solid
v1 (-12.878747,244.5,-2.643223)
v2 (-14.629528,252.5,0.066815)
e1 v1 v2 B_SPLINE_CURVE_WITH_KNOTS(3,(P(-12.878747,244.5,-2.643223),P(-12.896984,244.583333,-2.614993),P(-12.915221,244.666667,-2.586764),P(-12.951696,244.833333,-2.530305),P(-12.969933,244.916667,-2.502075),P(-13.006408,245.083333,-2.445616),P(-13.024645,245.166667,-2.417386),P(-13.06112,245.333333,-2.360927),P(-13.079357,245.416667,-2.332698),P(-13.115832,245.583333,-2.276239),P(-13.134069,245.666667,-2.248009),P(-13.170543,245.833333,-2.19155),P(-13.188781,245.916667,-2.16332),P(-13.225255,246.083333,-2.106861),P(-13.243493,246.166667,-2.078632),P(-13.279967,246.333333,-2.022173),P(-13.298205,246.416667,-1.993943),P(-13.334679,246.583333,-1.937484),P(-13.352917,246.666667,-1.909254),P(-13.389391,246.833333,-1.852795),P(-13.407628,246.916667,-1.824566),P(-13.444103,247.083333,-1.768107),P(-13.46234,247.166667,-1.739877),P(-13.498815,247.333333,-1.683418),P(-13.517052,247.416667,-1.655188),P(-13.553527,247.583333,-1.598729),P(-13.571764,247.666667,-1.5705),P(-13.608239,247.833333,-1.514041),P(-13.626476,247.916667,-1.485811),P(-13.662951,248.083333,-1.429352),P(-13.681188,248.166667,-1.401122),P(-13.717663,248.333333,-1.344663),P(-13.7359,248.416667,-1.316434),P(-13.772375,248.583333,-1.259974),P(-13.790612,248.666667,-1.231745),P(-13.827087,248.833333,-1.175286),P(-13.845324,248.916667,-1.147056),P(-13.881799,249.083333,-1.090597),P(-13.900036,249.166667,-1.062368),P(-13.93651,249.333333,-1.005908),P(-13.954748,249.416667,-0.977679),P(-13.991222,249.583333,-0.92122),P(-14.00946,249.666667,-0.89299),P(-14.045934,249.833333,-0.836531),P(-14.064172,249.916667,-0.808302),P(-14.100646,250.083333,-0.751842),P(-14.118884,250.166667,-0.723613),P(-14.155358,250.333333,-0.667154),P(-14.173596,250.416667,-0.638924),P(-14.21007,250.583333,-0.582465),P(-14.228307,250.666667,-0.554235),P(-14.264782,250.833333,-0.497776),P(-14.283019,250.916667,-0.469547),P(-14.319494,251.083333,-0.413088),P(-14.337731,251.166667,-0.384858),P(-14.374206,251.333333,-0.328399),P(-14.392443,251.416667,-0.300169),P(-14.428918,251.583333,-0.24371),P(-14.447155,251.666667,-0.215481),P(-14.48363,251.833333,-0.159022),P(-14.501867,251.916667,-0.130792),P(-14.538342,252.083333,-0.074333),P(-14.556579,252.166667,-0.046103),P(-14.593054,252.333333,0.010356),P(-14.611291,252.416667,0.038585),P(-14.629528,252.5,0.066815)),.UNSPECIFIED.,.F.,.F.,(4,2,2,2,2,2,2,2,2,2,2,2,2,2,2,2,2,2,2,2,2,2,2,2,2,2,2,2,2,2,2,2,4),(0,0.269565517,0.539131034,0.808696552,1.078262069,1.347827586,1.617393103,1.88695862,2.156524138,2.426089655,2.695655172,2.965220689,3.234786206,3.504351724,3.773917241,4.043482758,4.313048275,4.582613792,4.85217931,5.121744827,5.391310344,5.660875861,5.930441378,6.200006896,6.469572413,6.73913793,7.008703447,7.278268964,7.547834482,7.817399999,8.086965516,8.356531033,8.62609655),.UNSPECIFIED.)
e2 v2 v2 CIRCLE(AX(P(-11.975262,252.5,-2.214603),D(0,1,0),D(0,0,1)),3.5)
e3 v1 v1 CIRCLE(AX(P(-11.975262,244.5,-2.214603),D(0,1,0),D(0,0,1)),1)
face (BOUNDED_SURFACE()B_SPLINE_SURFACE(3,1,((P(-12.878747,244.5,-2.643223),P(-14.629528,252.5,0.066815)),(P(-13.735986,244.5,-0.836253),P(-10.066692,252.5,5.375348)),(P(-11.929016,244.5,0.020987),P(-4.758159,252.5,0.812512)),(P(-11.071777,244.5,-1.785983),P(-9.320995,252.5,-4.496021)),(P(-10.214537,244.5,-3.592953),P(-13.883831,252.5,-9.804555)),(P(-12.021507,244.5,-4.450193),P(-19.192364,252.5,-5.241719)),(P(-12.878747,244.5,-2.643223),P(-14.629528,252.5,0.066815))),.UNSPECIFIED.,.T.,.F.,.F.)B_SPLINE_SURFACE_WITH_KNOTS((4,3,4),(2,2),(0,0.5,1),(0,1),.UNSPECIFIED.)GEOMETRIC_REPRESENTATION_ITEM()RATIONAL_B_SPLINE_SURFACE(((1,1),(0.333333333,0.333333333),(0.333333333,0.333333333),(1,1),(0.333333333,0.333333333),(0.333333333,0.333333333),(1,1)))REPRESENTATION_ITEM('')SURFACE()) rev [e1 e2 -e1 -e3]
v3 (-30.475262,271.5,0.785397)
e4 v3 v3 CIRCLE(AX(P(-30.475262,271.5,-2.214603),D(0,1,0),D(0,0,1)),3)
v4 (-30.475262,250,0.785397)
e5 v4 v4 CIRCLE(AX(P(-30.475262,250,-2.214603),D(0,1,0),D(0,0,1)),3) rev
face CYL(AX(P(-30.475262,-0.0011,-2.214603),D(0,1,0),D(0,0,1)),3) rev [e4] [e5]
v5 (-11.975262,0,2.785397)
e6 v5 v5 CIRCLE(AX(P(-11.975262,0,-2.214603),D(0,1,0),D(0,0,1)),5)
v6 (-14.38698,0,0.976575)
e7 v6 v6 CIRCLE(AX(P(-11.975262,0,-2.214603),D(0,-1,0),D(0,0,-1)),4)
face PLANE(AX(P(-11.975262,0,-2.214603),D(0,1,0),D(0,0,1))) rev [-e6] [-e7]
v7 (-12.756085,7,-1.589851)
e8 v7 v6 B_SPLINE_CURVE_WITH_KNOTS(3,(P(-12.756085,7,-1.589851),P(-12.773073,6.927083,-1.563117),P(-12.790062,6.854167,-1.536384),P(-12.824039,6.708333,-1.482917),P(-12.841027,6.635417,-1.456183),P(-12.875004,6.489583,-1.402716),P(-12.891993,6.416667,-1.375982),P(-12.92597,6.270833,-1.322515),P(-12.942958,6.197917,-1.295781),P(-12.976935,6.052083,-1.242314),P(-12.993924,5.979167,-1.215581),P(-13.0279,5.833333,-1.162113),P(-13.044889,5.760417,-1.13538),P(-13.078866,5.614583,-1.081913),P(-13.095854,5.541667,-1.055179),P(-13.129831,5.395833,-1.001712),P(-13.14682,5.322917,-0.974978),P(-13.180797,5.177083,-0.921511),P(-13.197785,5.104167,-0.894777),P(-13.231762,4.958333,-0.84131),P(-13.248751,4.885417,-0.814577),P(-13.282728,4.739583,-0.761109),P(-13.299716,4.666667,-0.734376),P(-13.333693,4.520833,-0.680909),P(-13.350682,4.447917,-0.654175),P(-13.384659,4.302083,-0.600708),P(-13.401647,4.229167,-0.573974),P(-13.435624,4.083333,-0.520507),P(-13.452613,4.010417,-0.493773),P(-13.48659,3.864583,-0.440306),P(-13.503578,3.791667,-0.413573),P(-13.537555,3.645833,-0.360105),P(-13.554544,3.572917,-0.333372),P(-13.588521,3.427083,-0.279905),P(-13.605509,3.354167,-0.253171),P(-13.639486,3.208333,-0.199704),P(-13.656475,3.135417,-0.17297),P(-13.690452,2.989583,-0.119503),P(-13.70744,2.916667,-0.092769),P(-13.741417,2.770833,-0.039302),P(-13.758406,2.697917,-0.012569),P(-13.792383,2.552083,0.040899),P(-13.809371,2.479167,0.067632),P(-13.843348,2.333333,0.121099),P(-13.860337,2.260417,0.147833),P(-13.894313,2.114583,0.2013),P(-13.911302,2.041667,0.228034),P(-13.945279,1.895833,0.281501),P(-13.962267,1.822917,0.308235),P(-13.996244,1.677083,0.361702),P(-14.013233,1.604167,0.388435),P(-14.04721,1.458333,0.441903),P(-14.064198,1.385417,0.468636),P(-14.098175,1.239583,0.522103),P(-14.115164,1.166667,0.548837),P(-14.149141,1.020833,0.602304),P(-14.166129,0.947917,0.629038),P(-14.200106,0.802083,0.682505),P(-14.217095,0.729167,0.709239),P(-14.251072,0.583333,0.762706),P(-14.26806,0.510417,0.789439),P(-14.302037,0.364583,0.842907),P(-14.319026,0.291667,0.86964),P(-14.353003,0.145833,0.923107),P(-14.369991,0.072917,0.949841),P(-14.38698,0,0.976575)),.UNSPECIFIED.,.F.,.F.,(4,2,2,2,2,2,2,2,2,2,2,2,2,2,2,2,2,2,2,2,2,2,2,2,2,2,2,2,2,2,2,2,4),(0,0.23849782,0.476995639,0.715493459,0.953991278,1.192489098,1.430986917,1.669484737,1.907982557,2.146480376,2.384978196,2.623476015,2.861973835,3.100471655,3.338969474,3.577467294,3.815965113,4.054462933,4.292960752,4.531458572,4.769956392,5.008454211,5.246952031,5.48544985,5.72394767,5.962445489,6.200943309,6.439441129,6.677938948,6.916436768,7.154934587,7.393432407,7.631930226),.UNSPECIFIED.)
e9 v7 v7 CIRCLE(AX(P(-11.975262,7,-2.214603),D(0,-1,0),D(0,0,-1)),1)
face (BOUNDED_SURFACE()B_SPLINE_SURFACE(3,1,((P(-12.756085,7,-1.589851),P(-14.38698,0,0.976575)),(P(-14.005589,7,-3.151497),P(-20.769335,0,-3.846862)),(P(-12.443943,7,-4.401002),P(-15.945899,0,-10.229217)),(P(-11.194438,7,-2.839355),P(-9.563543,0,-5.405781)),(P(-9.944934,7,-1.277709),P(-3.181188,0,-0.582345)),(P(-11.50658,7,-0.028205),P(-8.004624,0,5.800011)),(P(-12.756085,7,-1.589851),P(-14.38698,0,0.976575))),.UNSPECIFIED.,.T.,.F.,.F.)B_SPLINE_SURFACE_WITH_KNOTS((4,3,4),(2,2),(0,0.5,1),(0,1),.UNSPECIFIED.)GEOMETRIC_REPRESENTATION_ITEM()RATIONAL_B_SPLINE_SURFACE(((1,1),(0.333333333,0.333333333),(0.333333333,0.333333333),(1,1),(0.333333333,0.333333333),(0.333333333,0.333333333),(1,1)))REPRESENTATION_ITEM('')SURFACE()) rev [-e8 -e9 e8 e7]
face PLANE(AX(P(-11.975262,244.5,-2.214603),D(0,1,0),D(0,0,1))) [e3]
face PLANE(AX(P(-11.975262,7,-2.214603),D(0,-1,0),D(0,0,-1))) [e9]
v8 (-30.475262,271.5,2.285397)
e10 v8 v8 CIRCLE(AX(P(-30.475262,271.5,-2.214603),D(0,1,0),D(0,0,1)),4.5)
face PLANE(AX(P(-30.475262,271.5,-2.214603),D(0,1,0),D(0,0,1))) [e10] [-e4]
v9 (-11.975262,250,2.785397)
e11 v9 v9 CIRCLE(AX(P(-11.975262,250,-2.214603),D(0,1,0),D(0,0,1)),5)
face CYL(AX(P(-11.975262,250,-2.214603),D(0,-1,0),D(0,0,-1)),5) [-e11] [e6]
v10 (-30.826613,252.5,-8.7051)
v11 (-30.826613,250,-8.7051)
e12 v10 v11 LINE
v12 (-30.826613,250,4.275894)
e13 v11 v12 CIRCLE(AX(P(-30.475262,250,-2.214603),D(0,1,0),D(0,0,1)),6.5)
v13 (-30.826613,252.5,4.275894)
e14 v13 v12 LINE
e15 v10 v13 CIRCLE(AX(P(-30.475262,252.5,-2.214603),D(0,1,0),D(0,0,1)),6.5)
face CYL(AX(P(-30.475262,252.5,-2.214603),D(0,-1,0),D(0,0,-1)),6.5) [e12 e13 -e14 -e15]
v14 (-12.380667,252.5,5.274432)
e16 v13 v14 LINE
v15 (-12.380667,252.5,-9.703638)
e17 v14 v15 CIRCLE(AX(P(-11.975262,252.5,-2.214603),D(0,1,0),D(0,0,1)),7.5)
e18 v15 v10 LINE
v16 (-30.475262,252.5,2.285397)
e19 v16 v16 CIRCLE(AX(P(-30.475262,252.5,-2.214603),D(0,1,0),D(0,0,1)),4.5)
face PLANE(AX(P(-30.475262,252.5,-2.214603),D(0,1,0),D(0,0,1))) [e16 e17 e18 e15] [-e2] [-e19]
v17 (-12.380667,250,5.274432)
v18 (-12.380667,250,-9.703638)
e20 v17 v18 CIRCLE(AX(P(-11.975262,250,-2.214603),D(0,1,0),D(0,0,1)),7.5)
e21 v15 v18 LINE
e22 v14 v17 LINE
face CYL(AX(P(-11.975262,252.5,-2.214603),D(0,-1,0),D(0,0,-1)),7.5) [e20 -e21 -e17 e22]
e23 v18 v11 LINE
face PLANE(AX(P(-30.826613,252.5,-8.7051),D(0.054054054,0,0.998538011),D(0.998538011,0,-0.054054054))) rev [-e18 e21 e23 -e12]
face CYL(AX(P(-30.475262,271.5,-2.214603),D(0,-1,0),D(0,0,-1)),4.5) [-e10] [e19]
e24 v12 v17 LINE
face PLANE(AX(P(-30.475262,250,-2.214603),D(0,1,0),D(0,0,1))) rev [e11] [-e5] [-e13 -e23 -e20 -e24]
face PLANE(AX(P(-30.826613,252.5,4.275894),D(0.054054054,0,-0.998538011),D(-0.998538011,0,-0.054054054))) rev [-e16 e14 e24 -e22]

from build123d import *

# Parameters (mm, degrees)
CROQUIS2_R              = 5
SALIENTE_EXTRUIR1_DEPTH = 250
SALIENTE_EXTRUIR2_DEPTH = 2.5
CROQUIS11_R             = 4.5
SALIENTE_EXTRUIR3_DEPTH = 19
CORTAR_EXTRUIR1_REACH   = 276.178
CROQUIS12_R             = 3


with BuildPart() as part:
    # Croquis2 → Saliente-Extruir1 (new body)
    with BuildSketch(Plane(origin=(0, 0, 0), x_dir=(1, 0, 0), z_dir=(0, 1, 0))):
        with Locations(Location((-11.975261547, 2.214603163, 0), (0, 0, 270))):
            Circle(CROQUIS2_R)
    extrude(amount=SALIENTE_EXTRUIR1_DEPTH)

    # Cortar-Recubrir1: read off the stored shape, not the designer's step
    # Cortar-Recubrir1: loft between two sections, ruled curve by curve
    cortar_recubrir1_from = [
        Edge.make_bspline([(-12.756084652, 7, -1.589850989), (-14.005589, 7, -3.151497198), (-12.443942791, 7, -4.401001547), (-11.194438443, 7, -2.839355337), (-9.944934094, 7, -1.277709127), (-11.506580304, 7, -0.028204779), (-12.756084652, 7, -1.589850989)], [0, 0, 0, 0, 0.5, 0.5, 0.5, 1, 1, 1, 1], 3, [1, 0.333333333, 0.333333333, 1, 0.333333333, 0.333333333, 1]),
    ]
    cortar_recubrir1_to = [
        Edge.make_bspline([(-14.386979714, 0, 0.976574595), (-20.76933523, 0, -3.846861738), (-15.945898897, 0, -10.229217255), (-9.563543381, 0, -5.405780921), (-3.181187864, 0, -0.582344588), (-8.004624198, 0, 5.800010929), (-14.386979714, 0, 0.976574595)], [0, 0, 0, 0, 0.5, 0.5, 0.5, 1, 1, 1, 1], 3, [1, 0.333333333, 0.333333333, 1, 0.333333333, 0.333333333, 1]),
    ]
    cortar_recubrir1 = Solid(Shell([*[Face.make_surface_from_curves(cortar_recubrir1_from[k], cortar_recubrir1_to[k]) for k in range(1)], Face(Wire(cortar_recubrir1_from)), Face(Wire(cortar_recubrir1_to))]))
    add(cortar_recubrir1, mode=Mode.SUBTRACT)

    # Croquis7 → Saliente-Extruir2 (add)
    with BuildSketch(Plane(origin=(0, 250, 0), x_dir=(1, 0, 0), z_dir=(0, 1, 0))):
        with BuildLine():
            Line((-30.826612899, 8.705100234), (-12.380666953, 9.703638245))
            ThreePointArc((-12.380666953, 9.703638245), (-4.475261547, 2.214603163), (-12.380666953, -5.274431919))
            Line((-12.380666953, -5.274431919), (-30.826612899, -4.275893908))
            ThreePointArc((-30.826612899, -4.275893908), (-36.975261547, 2.214603163), (-30.826612899, 8.705100234))
        make_face()
    extrude(amount=SALIENTE_EXTRUIR2_DEPTH)

    # Cortar-Recubrir2: read off the stored shape, not the designer's step
    # Cortar-Recubrir2: loft between two sections, ruled curve by curve
    cortar_recubrir2_from = [
        Edge.make_bspline([(-12.878746512, 244.5, -2.643222947), (-13.735986079, 244.5, -0.836253018), (-11.92901615, 244.5, 0.02098655), (-11.071776583, 244.5, -1.785983379), (-10.214537015, 244.5, -3.592953308), (-12.021506944, 244.5, -4.450192876), (-12.878746512, 244.5, -2.643222947)], [0, 0, 0, 0, 0.5, 0.5, 0.5, 1, 1, 1, 1], 3, [1, 0.333333333, 0.333333333, 1, 0.333333333, 0.333333333, 1]),
    ]
    cortar_recubrir2_to = [
        Edge.make_bspline([(-14.629528251, 252.5, 0.066814876), (-10.066692174, 252.5, 5.375348283), (-4.758158767, 252.5, 0.812512206), (-9.320994844, 252.5, -4.496021201), (-13.883830921, 252.5, -9.804554608), (-19.192364328, 252.5, -5.241718531), (-14.629528251, 252.5, 0.066814876)], [0, 0, 0, 0, 0.5, 0.5, 0.5, 1, 1, 1, 1], 3, [1, 0.333333333, 0.333333333, 1, 0.333333333, 0.333333333, 1]),
    ]
    cortar_recubrir2 = Solid(Shell([*[Face.make_surface_from_curves(cortar_recubrir2_from[k], cortar_recubrir2_to[k]) for k in range(1)], Face(Wire(cortar_recubrir2_from)), Face(Wire(cortar_recubrir2_to))]))
    add(cortar_recubrir2, mode=Mode.SUBTRACT)

    # Croquis11 → Saliente-Extruir3 (add)
    with BuildSketch(Plane(origin=(0, 252.5, 0), x_dir=(1, 0, 0), z_dir=(0, 1, 0))):
        with Locations(Location((-30.475261547, 2.214603163, 0), (0, 0, 270))):
            Circle(CROQUIS11_R)
    extrude(amount=SALIENTE_EXTRUIR3_DEPTH)

    # Croquis12 → Cortar-Extruir1 (cut, up to next)
    with BuildSketch(Plane(origin=(0, 271.5, 0), x_dir=(1, 0, 0), z_dir=(0, 1, 0)), mode=Mode.PRIVATE) as cortar_extruir1_sk1:
        with Locations(Location((-30.475261547, 2.214603163, 0), (0, 0, 270))):
            Circle(CROQUIS12_R)
    cortar_extruir1_tool1 = extrude(cortar_extruir1_sk1.sketch, amount=-CORTAR_EXTRUIR1_REACH, mode=Mode.PRIVATE) & part.part
    add(cortar_extruir1_tool1.solids().sort_by_distance((-30.475262, 271.5, -2.214603))[0], mode=Mode.SUBTRACT)


solid = part.part
